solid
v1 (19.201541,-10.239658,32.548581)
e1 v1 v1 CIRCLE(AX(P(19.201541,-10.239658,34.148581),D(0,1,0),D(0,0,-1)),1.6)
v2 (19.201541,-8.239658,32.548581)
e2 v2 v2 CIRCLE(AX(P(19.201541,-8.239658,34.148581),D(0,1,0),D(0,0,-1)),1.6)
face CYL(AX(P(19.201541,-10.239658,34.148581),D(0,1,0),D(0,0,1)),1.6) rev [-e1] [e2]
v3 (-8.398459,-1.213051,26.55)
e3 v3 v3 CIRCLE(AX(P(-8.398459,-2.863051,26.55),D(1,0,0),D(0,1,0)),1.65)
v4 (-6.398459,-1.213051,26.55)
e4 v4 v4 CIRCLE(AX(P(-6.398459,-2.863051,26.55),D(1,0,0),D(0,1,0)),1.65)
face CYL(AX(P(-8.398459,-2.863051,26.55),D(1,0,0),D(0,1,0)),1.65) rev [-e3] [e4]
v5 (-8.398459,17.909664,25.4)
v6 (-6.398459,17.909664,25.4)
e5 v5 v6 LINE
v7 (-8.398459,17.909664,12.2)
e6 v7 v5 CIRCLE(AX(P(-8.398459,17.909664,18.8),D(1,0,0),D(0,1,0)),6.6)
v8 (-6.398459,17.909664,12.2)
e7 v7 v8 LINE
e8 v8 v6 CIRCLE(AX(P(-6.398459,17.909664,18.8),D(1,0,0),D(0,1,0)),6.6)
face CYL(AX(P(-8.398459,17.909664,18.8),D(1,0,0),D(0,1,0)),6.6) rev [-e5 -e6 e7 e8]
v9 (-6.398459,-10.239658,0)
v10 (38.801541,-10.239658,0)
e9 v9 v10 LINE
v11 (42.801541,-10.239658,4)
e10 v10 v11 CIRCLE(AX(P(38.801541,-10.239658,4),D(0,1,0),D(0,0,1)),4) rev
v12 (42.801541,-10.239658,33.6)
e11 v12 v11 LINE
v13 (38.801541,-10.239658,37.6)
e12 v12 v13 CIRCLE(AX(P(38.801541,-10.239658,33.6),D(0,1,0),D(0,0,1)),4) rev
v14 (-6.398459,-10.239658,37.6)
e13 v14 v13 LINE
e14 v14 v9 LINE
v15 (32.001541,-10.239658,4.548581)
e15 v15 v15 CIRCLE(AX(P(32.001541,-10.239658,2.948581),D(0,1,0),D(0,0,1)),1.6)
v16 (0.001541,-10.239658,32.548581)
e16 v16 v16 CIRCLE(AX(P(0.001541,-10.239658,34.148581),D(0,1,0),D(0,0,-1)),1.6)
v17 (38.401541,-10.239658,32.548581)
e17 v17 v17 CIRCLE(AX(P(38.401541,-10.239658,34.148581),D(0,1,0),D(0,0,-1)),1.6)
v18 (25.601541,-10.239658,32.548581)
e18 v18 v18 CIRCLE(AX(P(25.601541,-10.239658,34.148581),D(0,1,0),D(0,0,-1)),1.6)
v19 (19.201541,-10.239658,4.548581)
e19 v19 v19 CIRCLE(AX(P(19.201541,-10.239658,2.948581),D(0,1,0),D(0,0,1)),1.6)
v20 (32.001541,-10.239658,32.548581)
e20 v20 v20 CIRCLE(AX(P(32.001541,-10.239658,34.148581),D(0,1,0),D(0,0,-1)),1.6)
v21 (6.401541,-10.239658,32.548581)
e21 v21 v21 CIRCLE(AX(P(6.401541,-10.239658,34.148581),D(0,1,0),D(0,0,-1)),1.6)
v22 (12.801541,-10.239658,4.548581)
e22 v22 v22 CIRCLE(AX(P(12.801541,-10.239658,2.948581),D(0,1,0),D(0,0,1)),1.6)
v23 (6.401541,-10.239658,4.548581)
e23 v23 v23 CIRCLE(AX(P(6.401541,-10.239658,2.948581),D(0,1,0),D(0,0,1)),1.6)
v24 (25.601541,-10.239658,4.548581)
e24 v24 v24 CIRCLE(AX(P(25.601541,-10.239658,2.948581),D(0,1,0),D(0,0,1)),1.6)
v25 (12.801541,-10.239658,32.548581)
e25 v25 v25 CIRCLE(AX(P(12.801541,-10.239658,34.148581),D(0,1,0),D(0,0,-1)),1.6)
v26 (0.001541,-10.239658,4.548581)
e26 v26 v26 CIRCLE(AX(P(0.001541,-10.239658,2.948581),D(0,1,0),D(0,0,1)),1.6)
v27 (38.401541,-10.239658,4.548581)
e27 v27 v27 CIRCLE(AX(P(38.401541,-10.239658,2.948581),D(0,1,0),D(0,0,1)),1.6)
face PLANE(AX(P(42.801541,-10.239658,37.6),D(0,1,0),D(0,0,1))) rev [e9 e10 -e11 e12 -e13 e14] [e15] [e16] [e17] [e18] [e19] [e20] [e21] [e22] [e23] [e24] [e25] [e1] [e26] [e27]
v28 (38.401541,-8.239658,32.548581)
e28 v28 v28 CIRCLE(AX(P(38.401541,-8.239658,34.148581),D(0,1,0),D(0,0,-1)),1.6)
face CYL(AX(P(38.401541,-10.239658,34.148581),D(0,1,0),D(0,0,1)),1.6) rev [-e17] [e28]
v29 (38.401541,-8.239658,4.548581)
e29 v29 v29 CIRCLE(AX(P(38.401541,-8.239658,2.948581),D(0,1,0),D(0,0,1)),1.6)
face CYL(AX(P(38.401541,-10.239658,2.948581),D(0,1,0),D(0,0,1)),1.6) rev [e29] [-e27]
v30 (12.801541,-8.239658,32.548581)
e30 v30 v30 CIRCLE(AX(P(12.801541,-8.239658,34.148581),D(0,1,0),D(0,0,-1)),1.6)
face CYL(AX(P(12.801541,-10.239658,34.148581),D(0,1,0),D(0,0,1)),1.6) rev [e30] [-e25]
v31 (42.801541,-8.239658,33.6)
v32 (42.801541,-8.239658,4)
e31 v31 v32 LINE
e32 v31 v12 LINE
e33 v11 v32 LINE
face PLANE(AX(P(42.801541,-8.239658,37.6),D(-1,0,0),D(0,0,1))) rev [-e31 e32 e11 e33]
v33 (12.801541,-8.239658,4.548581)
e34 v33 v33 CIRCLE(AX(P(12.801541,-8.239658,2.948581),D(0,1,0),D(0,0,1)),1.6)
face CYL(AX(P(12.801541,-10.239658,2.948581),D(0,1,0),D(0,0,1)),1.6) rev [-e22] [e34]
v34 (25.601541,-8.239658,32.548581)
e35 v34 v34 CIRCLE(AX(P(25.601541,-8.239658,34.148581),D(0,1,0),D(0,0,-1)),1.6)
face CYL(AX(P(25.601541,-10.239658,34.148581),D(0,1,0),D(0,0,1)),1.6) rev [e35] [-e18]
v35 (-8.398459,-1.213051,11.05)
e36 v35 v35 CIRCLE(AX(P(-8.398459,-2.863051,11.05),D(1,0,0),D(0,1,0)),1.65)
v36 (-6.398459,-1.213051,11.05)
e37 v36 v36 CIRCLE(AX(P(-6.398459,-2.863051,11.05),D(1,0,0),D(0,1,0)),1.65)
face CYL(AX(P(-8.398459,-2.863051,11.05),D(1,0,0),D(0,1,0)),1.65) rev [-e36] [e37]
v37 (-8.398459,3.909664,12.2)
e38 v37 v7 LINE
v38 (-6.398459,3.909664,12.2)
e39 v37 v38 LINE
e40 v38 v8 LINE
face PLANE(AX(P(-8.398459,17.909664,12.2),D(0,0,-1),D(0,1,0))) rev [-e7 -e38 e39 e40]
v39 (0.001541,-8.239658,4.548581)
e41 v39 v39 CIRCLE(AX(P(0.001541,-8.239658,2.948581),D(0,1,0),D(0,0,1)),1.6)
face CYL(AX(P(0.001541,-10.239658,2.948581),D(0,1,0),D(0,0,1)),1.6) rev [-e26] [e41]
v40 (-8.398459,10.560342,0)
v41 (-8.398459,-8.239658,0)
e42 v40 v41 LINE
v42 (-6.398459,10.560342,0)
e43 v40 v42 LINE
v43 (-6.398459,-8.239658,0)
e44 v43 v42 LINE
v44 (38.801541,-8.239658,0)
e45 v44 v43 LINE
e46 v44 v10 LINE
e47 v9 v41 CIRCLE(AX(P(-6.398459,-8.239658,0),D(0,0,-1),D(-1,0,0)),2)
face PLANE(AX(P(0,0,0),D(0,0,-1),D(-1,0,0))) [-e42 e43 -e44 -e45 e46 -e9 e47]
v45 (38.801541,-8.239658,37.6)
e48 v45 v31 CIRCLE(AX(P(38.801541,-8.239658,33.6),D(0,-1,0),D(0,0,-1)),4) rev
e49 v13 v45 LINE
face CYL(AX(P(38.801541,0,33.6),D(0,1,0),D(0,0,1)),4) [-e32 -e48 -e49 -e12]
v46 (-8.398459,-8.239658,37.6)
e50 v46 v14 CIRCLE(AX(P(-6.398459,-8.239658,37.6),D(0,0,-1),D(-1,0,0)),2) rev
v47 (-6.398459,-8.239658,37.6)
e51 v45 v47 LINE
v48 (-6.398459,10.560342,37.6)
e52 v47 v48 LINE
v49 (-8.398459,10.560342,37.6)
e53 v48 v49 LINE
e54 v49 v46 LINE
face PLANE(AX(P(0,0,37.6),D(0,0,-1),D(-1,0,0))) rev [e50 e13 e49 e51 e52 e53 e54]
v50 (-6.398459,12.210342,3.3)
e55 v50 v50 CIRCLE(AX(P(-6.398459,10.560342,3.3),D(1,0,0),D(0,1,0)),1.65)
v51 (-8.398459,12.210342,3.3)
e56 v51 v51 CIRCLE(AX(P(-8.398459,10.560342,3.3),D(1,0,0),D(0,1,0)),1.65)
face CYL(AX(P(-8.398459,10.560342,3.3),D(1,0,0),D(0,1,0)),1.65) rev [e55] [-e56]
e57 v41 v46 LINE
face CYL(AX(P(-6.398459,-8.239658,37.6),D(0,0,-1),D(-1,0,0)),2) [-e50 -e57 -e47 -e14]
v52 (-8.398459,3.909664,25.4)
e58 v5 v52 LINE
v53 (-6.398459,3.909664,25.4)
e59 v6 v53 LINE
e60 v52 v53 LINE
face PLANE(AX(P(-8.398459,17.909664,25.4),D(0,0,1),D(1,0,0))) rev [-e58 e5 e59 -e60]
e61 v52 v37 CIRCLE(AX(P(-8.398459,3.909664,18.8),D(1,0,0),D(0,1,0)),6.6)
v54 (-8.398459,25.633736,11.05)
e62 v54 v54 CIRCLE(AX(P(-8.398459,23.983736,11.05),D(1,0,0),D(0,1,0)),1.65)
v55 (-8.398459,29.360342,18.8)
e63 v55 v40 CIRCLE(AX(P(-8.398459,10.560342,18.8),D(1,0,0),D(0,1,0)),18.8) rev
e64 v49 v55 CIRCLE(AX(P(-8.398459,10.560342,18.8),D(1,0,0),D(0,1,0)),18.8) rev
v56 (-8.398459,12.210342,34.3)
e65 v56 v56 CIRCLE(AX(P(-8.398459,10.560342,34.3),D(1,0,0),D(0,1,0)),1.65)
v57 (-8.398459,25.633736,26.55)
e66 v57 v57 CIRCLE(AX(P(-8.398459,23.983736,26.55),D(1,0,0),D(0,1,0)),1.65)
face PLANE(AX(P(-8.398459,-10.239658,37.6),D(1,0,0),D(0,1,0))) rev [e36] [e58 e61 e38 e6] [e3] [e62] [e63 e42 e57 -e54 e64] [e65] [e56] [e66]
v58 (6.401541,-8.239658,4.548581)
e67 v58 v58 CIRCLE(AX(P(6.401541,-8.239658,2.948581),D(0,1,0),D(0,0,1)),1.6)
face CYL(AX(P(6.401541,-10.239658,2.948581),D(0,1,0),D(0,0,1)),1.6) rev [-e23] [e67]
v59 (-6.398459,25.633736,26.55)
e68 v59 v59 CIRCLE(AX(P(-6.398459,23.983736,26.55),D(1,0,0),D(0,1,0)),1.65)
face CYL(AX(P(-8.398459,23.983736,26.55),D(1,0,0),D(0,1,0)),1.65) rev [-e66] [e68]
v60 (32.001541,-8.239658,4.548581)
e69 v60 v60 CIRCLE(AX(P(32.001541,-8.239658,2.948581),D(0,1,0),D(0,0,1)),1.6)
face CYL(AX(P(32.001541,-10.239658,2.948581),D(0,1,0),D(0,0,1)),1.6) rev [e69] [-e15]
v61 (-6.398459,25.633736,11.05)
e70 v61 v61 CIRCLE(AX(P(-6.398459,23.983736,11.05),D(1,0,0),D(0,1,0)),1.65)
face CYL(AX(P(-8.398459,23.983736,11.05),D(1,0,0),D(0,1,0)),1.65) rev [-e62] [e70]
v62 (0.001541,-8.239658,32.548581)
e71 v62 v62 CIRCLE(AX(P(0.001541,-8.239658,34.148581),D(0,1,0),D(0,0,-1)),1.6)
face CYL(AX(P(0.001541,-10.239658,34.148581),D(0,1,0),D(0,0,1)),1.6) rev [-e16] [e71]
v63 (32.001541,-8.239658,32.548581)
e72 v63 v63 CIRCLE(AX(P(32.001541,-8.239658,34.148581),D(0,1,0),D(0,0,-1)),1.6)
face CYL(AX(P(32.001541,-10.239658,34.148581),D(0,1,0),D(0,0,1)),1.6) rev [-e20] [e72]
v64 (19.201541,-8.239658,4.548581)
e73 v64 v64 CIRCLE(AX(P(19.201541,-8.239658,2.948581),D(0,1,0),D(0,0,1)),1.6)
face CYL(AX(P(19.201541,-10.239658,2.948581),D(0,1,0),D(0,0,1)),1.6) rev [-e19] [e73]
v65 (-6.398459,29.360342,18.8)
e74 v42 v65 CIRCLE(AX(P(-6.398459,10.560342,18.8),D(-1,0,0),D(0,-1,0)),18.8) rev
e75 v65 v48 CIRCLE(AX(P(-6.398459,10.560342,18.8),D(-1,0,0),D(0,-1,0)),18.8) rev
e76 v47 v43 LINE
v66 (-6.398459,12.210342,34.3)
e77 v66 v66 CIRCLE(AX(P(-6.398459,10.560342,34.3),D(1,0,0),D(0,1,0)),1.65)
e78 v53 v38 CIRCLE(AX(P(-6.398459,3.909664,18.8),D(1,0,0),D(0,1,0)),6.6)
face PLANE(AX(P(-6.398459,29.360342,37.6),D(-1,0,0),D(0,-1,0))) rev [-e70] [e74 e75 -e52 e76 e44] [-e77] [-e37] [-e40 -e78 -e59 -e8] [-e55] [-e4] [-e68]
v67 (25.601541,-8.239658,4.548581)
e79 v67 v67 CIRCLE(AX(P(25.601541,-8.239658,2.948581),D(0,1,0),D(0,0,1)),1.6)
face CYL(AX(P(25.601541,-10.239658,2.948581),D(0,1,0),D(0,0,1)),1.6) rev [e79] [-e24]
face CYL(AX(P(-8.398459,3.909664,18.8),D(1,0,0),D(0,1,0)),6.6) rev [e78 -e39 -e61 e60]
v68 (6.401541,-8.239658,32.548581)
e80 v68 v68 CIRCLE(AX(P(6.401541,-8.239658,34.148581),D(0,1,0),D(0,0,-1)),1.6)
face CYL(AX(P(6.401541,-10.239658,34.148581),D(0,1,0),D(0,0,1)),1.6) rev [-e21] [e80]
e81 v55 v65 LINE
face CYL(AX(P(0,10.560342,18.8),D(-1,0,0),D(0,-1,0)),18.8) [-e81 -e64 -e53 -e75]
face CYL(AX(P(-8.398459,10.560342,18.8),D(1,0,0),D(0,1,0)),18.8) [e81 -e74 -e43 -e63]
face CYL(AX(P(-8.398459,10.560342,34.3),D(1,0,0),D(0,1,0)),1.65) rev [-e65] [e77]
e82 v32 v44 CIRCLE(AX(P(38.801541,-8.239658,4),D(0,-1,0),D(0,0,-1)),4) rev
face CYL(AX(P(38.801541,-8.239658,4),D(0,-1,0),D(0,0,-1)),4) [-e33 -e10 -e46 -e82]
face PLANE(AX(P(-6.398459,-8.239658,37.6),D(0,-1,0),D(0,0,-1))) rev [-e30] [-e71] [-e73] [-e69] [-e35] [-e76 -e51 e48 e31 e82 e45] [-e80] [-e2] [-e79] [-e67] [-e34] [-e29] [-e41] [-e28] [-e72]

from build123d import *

# Parameters (mm, degrees)
BOSS_EXTRUDE1_DEPTH = 37.6
SKETCH2_R           = 1.65
CUT_EXTRUDE1_DEPTH  = 69.530502022
SKETCH3_R           = 1.6
CUT_EXTRUDE2_DEPTH  = 69.260471168
FILLET1_R           = 18.8
FILLET2_R           = 2
FILLET3_R           = 4


with BuildPart() as part:
    # Sketch1 → Boss-Extrude1 (new body)
    with BuildSketch(Plane.XY):
        Polygon((-8.398458859, 29.360342427), (-6.398458859, 29.360342427), (-6.398458859, -8.239657573), (42.801541141, -8.239657573), (42.801541141, -10.239657573), (-8.398458859, -10.239657573), align=None)
    extrude(amount=BOSS_EXTRUDE1_DEPTH)

    # Sketch2 → Cut-Extrude1 (cut, through all)
    with BuildSketch(Plane(origin=(-6.398458859, 0, 0), x_dir=(0, 0, -1), z_dir=(1, 0, 0))):
        with Locations(Location((-34.3, 10.560342427, 0), (0, 0, 90))):
            Circle(SKETCH2_R)
        with Locations(Location((-26.55, 23.983736186, 0), (0, 0, 90))):
            Circle(SKETCH2_R)
        with Locations(Location((-11.05, 23.983736186, 0), (0, 0, 90))):
            Circle(SKETCH2_R)
        with Locations(Location((-3.3, 10.560342427, 0), (0, 0, 90))):
            Circle(SKETCH2_R)
        with Locations(Location((-11.05, -2.863051332, 0), (0, 0, 90))):
            Circle(SKETCH2_R)
        with Locations(Location((-26.55, -2.863051332, 0), (0, 0, 90))):
            Circle(SKETCH2_R)
        with BuildLine():
            Line((-12.2, 17.909663616), (-12.2, 3.909663616))
            ThreePointArc((-12.2, 3.909663616), (-18.8, -2.690336384), (-25.4, 3.909663616))
            Line((-25.4, 3.909663616), (-25.4, 17.909663616))
            ThreePointArc((-25.4, 17.909663616), (-18.8, 24.509663616), (-12.2, 17.909663616))
        make_face()
    extrude(amount=-CUT_EXTRUDE1_DEPTH, mode=Mode.SUBTRACT)

    # Sketch3 → Cut-Extrude2 (cut, through all)
    with BuildSketch(Plane(origin=(0, -8.239657573, 0), x_dir=(1, 0, 0), z_dir=(0, 1, 0))):
        with Locations(Location((0.001541141, -2.94858142, 0), (0, 0, 270))):
            Circle(SKETCH3_R)
        with Locations(Location((6.401541141, -2.94858142, 0), (0, 0, 270))):
            Circle(SKETCH3_R)
        with Locations(Location((12.801541141, -2.94858142, 0), (0, 0, 270))):
            Circle(SKETCH3_R)
        with Locations(Location((19.201541141, -2.94858142, 0), (0, 0, 270))):
            Circle(SKETCH3_R)
        with Locations(Location((25.601541141, -2.94858142, 0), (0, 0, 270))):
            Circle(SKETCH3_R)
        with Locations(Location((32.001541141, -2.94858142, 0), (0, 0, 270))):
            Circle(SKETCH3_R)
        with Locations(Location((38.401541141, -2.94858142, 0), (0, 0, 270))):
            Circle(SKETCH3_R)
        with Locations(Location((38.401541141, -34.14858142, 0), (0, 0, 90))):
            Circle(SKETCH3_R)
        with Locations(Location((32.001541141, -34.14858142, 0), (0, 0, 90))):
            Circle(SKETCH3_R)
        with Locations(Location((25.601541141, -34.14858142, 0), (0, 0, 90))):
            Circle(SKETCH3_R)
        with Locations(Location((19.201541141, -34.14858142, 0), (0, 0, 90))):
            Circle(SKETCH3_R)
        with Locations(Location((12.801541141, -34.14858142, 0), (0, 0, 90))):
            Circle(SKETCH3_R)
        with Locations(Location((6.401541141, -34.14858142, 0), (0, 0, 90))):
            Circle(SKETCH3_R)
        with Locations(Location((0.001541141, -34.14858142, 0), (0, 0, 90))):
            Circle(SKETCH3_R)
    extrude(amount=-CUT_EXTRUDE2_DEPTH, mode=Mode.SUBTRACT)

    # Fillet1
    fillet1_edges = [part.edges().sort_by_distance(p)[0] for p in [
        (-7.398458859, 29.360342427, 0),
        (-7.398458859, 29.360342427, 37.6),
    ]]
    fillet(fillet1_edges, radius=FILLET1_R - 0.0001)  # a hair under: the kernel refuses the full size

    # Fillet2
    fillet2_edges = [part.edges().sort_by_distance(p)[0] for p in [
        (-8.398458859, -10.239657573, 18.8),
    ]]
    fillet(fillet2_edges, radius=FILLET2_R)

    # Fillet3
    fillet3_edges = [part.edges().sort_by_distance(p)[0] for p in [
        (42.801541141, -9.239657573, 37.6),
        (42.801541141, -9.239657573, 0),
    ]]
    fillet(fillet3_edges, radius=FILLET3_R)


solid = part.part
